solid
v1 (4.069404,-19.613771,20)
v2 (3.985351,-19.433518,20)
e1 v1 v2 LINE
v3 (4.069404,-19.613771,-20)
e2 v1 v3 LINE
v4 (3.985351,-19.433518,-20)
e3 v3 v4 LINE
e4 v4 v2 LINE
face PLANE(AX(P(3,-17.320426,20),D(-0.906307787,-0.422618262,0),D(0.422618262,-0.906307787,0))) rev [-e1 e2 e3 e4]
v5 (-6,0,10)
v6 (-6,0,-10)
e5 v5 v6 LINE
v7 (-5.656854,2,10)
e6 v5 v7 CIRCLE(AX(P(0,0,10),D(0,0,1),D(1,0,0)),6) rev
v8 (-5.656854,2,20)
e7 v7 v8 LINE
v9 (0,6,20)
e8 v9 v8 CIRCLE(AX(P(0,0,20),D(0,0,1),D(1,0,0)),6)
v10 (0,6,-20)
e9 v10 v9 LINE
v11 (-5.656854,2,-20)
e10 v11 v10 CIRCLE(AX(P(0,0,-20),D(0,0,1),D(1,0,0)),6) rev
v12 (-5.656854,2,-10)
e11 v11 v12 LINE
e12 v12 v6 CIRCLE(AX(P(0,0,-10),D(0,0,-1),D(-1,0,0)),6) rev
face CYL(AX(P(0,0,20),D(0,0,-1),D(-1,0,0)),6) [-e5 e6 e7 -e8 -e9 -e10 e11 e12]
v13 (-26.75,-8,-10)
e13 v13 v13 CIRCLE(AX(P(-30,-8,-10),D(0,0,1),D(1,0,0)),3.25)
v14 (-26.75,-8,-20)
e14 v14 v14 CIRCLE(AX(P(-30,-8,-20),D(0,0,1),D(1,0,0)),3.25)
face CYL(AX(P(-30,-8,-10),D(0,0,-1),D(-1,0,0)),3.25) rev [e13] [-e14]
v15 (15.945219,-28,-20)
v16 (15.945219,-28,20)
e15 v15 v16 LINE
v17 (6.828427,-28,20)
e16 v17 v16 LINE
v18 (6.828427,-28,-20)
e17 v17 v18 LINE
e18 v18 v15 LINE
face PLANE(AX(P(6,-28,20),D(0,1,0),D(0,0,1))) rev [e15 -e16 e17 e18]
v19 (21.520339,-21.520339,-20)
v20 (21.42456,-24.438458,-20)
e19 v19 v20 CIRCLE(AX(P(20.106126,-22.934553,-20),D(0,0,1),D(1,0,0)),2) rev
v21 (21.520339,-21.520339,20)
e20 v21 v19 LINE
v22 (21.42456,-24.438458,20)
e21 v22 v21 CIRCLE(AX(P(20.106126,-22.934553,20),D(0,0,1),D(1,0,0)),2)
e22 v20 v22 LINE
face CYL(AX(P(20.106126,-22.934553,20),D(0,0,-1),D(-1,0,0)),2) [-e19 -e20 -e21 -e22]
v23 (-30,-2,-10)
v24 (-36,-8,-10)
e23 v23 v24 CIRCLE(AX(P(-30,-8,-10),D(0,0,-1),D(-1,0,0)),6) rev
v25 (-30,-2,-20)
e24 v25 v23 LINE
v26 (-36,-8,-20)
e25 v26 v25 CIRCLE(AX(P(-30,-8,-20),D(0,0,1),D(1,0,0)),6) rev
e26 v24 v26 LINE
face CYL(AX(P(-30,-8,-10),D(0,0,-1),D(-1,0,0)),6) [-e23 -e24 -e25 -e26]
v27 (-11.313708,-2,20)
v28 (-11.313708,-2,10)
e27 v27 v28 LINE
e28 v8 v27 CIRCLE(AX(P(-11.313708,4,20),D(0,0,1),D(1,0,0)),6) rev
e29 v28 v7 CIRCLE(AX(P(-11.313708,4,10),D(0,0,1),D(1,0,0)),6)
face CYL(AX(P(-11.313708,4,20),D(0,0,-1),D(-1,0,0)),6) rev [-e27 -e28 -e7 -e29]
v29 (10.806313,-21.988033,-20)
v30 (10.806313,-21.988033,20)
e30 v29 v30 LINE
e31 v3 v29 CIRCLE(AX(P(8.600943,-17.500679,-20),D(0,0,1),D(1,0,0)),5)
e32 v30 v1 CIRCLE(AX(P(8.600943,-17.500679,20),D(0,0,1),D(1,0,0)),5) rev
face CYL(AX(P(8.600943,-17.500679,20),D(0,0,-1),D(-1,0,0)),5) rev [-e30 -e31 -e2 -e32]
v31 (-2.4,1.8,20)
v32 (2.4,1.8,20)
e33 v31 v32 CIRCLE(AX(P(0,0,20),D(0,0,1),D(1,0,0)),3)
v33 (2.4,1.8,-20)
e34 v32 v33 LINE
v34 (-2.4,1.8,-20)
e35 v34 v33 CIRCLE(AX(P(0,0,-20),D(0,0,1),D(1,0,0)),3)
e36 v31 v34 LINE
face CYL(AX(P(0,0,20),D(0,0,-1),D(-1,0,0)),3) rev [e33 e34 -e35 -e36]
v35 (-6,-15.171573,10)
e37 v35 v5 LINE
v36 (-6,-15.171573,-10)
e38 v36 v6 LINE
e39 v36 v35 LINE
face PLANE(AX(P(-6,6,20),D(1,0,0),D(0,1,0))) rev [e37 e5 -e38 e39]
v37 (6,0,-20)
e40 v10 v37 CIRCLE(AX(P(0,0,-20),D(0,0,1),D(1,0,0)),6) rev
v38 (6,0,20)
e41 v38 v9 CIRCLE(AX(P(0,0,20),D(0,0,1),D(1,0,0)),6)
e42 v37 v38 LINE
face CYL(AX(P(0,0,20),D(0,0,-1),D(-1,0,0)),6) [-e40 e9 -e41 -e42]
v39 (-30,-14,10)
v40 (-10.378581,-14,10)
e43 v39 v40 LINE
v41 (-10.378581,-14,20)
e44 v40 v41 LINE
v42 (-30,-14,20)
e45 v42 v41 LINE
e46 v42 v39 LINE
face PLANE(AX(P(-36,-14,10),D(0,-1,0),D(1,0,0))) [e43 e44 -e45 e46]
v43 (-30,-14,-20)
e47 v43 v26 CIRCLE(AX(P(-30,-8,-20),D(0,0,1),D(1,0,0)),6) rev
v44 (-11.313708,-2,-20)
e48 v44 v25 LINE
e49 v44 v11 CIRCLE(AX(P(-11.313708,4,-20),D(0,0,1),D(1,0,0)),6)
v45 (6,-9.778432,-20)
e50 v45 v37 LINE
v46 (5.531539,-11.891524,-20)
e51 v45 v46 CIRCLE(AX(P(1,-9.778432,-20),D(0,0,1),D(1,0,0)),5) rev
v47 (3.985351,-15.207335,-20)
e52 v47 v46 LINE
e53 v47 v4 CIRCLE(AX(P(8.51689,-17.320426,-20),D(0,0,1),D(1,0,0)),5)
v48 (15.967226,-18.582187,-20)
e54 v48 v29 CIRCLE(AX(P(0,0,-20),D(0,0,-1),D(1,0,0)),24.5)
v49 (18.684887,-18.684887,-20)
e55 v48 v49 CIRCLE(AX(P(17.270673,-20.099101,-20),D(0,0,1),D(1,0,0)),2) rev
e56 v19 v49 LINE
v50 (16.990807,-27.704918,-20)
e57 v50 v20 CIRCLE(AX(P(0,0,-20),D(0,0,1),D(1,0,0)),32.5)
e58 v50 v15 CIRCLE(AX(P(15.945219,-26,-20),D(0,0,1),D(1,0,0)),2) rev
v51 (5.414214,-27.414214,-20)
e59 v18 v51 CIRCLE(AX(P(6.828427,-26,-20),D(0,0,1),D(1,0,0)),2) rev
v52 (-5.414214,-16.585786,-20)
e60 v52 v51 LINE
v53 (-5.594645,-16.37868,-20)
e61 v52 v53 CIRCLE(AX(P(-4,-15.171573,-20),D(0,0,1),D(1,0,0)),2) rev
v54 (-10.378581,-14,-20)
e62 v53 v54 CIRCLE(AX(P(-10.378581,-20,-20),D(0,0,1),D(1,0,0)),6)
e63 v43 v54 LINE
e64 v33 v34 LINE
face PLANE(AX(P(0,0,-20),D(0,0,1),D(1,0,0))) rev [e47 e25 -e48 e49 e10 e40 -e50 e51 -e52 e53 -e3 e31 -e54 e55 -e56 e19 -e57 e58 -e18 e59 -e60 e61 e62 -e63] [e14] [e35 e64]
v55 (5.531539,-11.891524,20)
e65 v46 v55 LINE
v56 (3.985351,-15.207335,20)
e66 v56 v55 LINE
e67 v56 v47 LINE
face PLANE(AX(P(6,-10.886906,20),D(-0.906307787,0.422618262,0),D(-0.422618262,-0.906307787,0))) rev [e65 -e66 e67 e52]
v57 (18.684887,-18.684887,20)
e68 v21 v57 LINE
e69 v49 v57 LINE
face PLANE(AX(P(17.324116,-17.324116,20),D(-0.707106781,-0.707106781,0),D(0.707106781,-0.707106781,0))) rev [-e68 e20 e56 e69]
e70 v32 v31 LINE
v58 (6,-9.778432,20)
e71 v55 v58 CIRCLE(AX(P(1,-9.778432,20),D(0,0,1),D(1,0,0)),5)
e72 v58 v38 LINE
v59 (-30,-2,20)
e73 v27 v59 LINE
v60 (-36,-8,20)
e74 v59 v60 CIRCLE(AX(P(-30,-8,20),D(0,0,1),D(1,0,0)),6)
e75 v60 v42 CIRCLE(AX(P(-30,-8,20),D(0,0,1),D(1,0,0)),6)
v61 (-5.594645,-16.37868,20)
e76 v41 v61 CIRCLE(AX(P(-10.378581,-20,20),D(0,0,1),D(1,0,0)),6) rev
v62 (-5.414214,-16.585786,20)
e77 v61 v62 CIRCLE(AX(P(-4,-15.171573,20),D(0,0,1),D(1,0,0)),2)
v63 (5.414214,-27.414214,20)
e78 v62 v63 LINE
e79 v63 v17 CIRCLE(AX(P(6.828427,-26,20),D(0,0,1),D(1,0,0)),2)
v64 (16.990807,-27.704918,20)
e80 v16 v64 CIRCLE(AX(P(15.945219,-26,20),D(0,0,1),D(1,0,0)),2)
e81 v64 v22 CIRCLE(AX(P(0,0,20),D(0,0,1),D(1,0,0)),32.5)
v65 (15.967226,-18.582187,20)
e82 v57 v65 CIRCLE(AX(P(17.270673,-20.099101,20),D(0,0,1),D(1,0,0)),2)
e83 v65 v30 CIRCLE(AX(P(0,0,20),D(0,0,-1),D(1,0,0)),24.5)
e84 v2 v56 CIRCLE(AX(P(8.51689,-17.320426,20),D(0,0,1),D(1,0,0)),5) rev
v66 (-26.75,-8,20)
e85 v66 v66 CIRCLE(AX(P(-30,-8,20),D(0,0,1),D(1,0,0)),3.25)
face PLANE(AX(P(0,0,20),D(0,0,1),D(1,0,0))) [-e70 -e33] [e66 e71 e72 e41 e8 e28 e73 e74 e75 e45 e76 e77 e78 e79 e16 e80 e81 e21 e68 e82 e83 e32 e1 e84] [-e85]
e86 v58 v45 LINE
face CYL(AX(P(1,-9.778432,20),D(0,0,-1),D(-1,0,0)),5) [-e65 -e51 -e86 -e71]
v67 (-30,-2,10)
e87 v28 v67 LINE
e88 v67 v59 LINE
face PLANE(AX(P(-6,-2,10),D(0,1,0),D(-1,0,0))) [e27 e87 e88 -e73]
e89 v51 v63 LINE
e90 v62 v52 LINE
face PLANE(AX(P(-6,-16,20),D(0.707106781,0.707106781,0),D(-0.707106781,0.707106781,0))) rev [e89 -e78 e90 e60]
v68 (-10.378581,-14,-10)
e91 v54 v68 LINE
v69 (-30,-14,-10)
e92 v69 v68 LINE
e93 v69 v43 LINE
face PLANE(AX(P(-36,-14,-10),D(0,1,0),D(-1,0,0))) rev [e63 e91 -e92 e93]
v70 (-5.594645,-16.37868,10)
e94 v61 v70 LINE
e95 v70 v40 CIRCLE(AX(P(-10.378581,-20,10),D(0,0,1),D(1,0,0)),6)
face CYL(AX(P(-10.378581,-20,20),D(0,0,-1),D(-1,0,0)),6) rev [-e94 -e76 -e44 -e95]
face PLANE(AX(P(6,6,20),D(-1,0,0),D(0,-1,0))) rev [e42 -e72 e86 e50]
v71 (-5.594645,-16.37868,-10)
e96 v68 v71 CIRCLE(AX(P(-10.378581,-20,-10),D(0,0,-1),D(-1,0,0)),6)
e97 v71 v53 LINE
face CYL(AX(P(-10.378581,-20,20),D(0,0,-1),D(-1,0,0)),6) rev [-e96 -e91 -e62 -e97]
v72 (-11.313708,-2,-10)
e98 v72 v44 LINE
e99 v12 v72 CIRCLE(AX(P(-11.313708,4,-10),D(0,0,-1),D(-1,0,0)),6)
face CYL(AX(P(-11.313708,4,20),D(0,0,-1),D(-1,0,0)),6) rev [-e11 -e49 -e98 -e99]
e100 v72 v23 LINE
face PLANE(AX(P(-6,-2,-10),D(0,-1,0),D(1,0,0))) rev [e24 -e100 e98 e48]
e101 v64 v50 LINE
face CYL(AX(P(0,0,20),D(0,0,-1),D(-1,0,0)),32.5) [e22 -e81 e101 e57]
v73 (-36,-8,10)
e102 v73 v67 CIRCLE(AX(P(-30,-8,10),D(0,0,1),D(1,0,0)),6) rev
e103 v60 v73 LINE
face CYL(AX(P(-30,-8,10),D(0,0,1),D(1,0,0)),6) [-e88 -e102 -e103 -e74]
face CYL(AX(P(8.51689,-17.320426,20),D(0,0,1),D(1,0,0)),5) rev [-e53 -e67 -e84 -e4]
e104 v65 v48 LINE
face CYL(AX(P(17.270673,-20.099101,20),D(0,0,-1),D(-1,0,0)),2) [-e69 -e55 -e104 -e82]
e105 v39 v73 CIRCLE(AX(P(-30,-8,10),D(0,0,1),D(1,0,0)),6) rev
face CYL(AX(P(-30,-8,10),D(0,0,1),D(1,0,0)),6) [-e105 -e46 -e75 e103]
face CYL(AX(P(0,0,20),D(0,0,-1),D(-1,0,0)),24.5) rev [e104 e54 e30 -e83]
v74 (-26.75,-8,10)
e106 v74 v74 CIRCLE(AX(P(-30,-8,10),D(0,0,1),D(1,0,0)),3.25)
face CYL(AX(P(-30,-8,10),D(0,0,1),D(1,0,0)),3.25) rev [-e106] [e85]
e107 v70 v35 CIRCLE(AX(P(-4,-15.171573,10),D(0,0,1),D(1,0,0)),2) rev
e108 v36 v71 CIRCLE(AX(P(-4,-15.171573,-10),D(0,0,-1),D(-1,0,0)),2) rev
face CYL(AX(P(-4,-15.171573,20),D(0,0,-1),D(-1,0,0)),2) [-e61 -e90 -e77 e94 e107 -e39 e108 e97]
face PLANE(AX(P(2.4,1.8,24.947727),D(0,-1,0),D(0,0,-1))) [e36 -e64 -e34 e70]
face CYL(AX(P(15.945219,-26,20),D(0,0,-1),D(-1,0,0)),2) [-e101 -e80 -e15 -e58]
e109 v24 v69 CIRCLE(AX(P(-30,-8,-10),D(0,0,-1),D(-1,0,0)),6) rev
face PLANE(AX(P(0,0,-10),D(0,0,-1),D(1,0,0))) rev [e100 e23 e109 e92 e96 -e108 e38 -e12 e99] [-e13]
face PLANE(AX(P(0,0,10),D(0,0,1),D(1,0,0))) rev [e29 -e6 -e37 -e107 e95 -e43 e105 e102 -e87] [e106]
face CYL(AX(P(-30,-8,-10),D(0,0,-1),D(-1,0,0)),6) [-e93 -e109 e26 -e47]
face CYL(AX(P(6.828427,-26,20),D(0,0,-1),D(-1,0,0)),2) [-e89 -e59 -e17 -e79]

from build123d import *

# Parameters (mm, degrees)
SKETCH2_R            = 3
BOSS_EXTRUDE1_DEPTH  = 20
FILLET1_R            = 6
FILLET2_R            = 2
FILLET4_R            = 5
SKETCH3_W            = 30
SKETCH3_H            = 12
SKETCH3_R            = 3.25
BOSS_EXTRUDE2_DEPTH  = 10
FILLET3_R            = 6
FILLET3_OF_MIRROR1_R = 6
BOSS_EXTRUDE3_DEPTH  = 40


# Some blends are built 0.0001 mm under size
with BuildPart() as part:
    # Sketch2 → Boss-Extrude1 (new, symmetric)
    with BuildSketch(Plane.XY):
        with BuildLine():
            Line((-6, 6), (6, 6))
            Line((6, 6), (6, -10.886905517))
            Line((6, -10.886905517), (3, -17.320426279))
            Line((3, -17.320426279), (6, -23.75394704))
            ThreePointArc((6, -23.75394704), (12.097077324, -21.305180596), (17.324116139, -17.324116139))
            Line((17.324116139, -17.324116139), (22.980970389, -22.980970389))
            ThreePointArc((22.980970389, -22.980970389), (19.899357283, -25.695633476), (16.5, -28))
            Line((16.5, -28), (6, -28))
            Line((6, -28), (-6, -16))
            Line((-6, -16), (-6, 6))
        make_face()
        Circle(SKETCH2_R, mode=Mode.SUBTRACT)
    extrude(amount=BOSS_EXTRUDE1_DEPTH, both=True)

    # Fillet1
    fillet1_edges = [part.edges().sort_by_distance(p)[0] for p in [
        (6, 6, 0),
        (-6, 6, 0),
    ]]
    fillet(fillet1_edges, radius=FILLET1_R - 0.0001)  # a hair under: the kernel refuses the full size

    # Fillet2
    fillet2_edges = [part.edges().sort_by_distance(p)[0] for p in [
        (17.324116139, -17.324116139, 0),
        (22.980970389, -22.980970389, 0),
        (16.5, -28, 0),
        (6, -28, 0),
        (-6, -16, 0),
    ]]
    fillet(fillet2_edges, radius=FILLET2_R)

    # Fillet4
    fillet4_edges = [part.edges().sort_by_distance(p)[0] for p in [
        (6, -10.886905517, 0),
        (3, -17.320426279, 0),
        (6, -23.75394704, 0),
    ]]
    fillet(fillet4_edges, radius=FILLET4_R)

    # Sketch3 → Boss-Extrude2 (add)
    with BuildSketch(Plane.XY.offset(20)):
        with Locations((-21, -8)):
            Rectangle(SKETCH3_W, SKETCH3_H)
        with Locations((-30, -8)):
            Circle(SKETCH3_R, mode=Mode.SUBTRACT)
    boss_extrude2 = extrude(amount=-BOSS_EXTRUDE2_DEPTH)

    # Fillet3
    # the kernel refuses this fillet: 6 mm, written as the material it adds along each edge
    with BuildSketch(Plane(origin=(-6, -14, 20), x_dir=(0.16798992441845362, -0.9857887122978647, 0), z_dir=(0, 0, -1))) as fillet3_piece_1:
        with BuildLine():
            CenterArc((5.179174836, 5.324294957), FILLET3_R, 189.670969531, 52.875183342)
            Line((-0.735557438, 4.316355411), (-1.327030665, 4.215561456))
            Line((-1.327030665, 4.215561456), (-0.591473227, -0.100793955))
            Line((-0.591473227, -0.100793955), (0.100793955, -0.591473227))
            ThreePointArc((0.100793955, -0.591473227), (1.255717271, -0.394660789), (2.136350707, -0.532429496))
            Line((2.136350707, -0.532429496), (2.412971083, 0))
        make_face()
    extrude(amount=10)
    with BuildSketch(Plane(origin=(-6, -2, 20), x_dir=(0.08546746952976336, 0.9963409615448815, 0), z_dir=(0, 0, -1))) as fillet3_piece_2:
        with BuildLine():
            CenterArc((5.523894047, -5.807099434), FILLET3_R, 104.567976289, 70.529116987)
            Line((-0.454151722, -5.294294617), (-1.051956299, -5.243014135))
            Line((-1.051956299, -5.243014135), (-0.597804577, 0.051280482))
            Line((-0.597804577, 0.051280482), (0.051280482, 0.597804577))
            ThreePointArc((0.051280482, 0.597804577), (2.044062039, 0.426861091), (3.863806292, 0.580709943))
            Line((3.863806292, 0.580709943), (4.014723361, 0))
        make_face()
    extrude(amount=10)
    # the kernel refuses this fillet: 6 mm, written as the material it takes off along each edge
    with BuildSketch(Plane(origin=(-36, -14, 35), x_dir=(0, 1, 0), z_dir=(0, 0, -1)), Plane(origin=(-36, -2, 35), x_dir=(1, 0, 0), z_dir=(0, 0, -1))) as fillet3_2_piece_1:
        with BuildLine():
            CenterArc((FILLET3_R, FILLET3_R), FILLET3_R, 180, 90)
            Line((0, FILLET3_R), (0, 0))
            Line((0, 0), (FILLET3_R, 0))
        make_face()
    extrude(amount=40, mode=Mode.SUBTRACT)

    # Mirror1: Boss-Extrude2 across plane
    add(boss_extrude2.mirror(Plane.XY))

    # Fillet3 of Mirror1
    # the kernel refuses this fillet: 6 mm, written as the material it adds along each edge
    with BuildSketch(Plane(origin=(-6, -14, -20), x_dir=(0.16798992441845362, -0.9857887122978647, 0), z_dir=(0, 0, 1))) as fillet3_of_mirror1_piece_1:
        with BuildLine():
            CenterArc((5.179174836, -5.324294957), FILLET3_OF_MIRROR1_R, 117.453847127, 52.875183342)
            Line((-0.735557438, -4.316355411), (-1.327030665, -4.215561456))
            Line((-1.327030665, -4.215561456), (-0.591473227, 0.100793955))
            Line((-0.591473227, 0.100793955), (0.100793955, 0.591473227))
            ThreePointArc((0.100793955, 0.591473227), (1.255717271, 0.394660789), (2.136350707, 0.532429496))
            Line((2.136350707, 0.532429496), (2.412971083, 0))
        make_face()
    extrude(amount=10)
    with BuildSketch(Plane(origin=(-6, -2, -20), x_dir=(0.08546746952976336, 0.9963409615448815, 0), z_dir=(0, 0, 1))) as fillet3_of_mirror1_piece_2:
        with BuildLine():
            CenterArc((5.523894047, 5.807099434), FILLET3_OF_MIRROR1_R, 184.902906724, 70.529116987)
            Line((-0.454151722, 5.294294617), (-1.051956299, 5.243014135))
            Line((-1.051956299, 5.243014135), (-0.597804577, -0.051280482))
            Line((-0.597804577, -0.051280482), (0.051280482, -0.597804577))
            ThreePointArc((0.051280482, -0.597804577), (2.044062039, -0.426861091), (3.863806292, -0.580709943))
            Line((3.863806292, -0.580709943), (4.014723361, 0))
        make_face()
    extrude(amount=10)
    # the kernel refuses this fillet: 6 mm, written as the material it takes off along each edge
    with BuildSketch(Plane(origin=(-36, -14, -35), x_dir=(1, 0, 0), z_dir=(0, 0, 1)), Plane(origin=(-36, -2, -35), x_dir=(0, -1, 0), z_dir=(0, 0, 1))) as fillet3_of_mirror1_2_piece_1:
        with BuildLine():
            CenterArc((FILLET3_OF_MIRROR1_R, FILLET3_OF_MIRROR1_R), FILLET3_OF_MIRROR1_R, 180, 90)
            Line((0, FILLET3_OF_MIRROR1_R), (0, 0))
            Line((0, 0), (FILLET3_OF_MIRROR1_R, 0))
        make_face()
    extrude(amount=40, mode=Mode.SUBTRACT)

    # Sketch4 → Boss-Extrude3 (add)
    with BuildSketch(Plane(origin=(0, 0, -20), x_dir=(-1, 0, 0), z_dir=(0, 0, -1))):
        with BuildLine():
            Line((-2.4, 1.8), (2.4, 1.8))
            ThreePointArc((2.4, 1.8), (0, 3), (-2.4, 1.8))
        make_face()
    extrude(amount=-BOSS_EXTRUDE3_DEPTH)


solid = part.part
